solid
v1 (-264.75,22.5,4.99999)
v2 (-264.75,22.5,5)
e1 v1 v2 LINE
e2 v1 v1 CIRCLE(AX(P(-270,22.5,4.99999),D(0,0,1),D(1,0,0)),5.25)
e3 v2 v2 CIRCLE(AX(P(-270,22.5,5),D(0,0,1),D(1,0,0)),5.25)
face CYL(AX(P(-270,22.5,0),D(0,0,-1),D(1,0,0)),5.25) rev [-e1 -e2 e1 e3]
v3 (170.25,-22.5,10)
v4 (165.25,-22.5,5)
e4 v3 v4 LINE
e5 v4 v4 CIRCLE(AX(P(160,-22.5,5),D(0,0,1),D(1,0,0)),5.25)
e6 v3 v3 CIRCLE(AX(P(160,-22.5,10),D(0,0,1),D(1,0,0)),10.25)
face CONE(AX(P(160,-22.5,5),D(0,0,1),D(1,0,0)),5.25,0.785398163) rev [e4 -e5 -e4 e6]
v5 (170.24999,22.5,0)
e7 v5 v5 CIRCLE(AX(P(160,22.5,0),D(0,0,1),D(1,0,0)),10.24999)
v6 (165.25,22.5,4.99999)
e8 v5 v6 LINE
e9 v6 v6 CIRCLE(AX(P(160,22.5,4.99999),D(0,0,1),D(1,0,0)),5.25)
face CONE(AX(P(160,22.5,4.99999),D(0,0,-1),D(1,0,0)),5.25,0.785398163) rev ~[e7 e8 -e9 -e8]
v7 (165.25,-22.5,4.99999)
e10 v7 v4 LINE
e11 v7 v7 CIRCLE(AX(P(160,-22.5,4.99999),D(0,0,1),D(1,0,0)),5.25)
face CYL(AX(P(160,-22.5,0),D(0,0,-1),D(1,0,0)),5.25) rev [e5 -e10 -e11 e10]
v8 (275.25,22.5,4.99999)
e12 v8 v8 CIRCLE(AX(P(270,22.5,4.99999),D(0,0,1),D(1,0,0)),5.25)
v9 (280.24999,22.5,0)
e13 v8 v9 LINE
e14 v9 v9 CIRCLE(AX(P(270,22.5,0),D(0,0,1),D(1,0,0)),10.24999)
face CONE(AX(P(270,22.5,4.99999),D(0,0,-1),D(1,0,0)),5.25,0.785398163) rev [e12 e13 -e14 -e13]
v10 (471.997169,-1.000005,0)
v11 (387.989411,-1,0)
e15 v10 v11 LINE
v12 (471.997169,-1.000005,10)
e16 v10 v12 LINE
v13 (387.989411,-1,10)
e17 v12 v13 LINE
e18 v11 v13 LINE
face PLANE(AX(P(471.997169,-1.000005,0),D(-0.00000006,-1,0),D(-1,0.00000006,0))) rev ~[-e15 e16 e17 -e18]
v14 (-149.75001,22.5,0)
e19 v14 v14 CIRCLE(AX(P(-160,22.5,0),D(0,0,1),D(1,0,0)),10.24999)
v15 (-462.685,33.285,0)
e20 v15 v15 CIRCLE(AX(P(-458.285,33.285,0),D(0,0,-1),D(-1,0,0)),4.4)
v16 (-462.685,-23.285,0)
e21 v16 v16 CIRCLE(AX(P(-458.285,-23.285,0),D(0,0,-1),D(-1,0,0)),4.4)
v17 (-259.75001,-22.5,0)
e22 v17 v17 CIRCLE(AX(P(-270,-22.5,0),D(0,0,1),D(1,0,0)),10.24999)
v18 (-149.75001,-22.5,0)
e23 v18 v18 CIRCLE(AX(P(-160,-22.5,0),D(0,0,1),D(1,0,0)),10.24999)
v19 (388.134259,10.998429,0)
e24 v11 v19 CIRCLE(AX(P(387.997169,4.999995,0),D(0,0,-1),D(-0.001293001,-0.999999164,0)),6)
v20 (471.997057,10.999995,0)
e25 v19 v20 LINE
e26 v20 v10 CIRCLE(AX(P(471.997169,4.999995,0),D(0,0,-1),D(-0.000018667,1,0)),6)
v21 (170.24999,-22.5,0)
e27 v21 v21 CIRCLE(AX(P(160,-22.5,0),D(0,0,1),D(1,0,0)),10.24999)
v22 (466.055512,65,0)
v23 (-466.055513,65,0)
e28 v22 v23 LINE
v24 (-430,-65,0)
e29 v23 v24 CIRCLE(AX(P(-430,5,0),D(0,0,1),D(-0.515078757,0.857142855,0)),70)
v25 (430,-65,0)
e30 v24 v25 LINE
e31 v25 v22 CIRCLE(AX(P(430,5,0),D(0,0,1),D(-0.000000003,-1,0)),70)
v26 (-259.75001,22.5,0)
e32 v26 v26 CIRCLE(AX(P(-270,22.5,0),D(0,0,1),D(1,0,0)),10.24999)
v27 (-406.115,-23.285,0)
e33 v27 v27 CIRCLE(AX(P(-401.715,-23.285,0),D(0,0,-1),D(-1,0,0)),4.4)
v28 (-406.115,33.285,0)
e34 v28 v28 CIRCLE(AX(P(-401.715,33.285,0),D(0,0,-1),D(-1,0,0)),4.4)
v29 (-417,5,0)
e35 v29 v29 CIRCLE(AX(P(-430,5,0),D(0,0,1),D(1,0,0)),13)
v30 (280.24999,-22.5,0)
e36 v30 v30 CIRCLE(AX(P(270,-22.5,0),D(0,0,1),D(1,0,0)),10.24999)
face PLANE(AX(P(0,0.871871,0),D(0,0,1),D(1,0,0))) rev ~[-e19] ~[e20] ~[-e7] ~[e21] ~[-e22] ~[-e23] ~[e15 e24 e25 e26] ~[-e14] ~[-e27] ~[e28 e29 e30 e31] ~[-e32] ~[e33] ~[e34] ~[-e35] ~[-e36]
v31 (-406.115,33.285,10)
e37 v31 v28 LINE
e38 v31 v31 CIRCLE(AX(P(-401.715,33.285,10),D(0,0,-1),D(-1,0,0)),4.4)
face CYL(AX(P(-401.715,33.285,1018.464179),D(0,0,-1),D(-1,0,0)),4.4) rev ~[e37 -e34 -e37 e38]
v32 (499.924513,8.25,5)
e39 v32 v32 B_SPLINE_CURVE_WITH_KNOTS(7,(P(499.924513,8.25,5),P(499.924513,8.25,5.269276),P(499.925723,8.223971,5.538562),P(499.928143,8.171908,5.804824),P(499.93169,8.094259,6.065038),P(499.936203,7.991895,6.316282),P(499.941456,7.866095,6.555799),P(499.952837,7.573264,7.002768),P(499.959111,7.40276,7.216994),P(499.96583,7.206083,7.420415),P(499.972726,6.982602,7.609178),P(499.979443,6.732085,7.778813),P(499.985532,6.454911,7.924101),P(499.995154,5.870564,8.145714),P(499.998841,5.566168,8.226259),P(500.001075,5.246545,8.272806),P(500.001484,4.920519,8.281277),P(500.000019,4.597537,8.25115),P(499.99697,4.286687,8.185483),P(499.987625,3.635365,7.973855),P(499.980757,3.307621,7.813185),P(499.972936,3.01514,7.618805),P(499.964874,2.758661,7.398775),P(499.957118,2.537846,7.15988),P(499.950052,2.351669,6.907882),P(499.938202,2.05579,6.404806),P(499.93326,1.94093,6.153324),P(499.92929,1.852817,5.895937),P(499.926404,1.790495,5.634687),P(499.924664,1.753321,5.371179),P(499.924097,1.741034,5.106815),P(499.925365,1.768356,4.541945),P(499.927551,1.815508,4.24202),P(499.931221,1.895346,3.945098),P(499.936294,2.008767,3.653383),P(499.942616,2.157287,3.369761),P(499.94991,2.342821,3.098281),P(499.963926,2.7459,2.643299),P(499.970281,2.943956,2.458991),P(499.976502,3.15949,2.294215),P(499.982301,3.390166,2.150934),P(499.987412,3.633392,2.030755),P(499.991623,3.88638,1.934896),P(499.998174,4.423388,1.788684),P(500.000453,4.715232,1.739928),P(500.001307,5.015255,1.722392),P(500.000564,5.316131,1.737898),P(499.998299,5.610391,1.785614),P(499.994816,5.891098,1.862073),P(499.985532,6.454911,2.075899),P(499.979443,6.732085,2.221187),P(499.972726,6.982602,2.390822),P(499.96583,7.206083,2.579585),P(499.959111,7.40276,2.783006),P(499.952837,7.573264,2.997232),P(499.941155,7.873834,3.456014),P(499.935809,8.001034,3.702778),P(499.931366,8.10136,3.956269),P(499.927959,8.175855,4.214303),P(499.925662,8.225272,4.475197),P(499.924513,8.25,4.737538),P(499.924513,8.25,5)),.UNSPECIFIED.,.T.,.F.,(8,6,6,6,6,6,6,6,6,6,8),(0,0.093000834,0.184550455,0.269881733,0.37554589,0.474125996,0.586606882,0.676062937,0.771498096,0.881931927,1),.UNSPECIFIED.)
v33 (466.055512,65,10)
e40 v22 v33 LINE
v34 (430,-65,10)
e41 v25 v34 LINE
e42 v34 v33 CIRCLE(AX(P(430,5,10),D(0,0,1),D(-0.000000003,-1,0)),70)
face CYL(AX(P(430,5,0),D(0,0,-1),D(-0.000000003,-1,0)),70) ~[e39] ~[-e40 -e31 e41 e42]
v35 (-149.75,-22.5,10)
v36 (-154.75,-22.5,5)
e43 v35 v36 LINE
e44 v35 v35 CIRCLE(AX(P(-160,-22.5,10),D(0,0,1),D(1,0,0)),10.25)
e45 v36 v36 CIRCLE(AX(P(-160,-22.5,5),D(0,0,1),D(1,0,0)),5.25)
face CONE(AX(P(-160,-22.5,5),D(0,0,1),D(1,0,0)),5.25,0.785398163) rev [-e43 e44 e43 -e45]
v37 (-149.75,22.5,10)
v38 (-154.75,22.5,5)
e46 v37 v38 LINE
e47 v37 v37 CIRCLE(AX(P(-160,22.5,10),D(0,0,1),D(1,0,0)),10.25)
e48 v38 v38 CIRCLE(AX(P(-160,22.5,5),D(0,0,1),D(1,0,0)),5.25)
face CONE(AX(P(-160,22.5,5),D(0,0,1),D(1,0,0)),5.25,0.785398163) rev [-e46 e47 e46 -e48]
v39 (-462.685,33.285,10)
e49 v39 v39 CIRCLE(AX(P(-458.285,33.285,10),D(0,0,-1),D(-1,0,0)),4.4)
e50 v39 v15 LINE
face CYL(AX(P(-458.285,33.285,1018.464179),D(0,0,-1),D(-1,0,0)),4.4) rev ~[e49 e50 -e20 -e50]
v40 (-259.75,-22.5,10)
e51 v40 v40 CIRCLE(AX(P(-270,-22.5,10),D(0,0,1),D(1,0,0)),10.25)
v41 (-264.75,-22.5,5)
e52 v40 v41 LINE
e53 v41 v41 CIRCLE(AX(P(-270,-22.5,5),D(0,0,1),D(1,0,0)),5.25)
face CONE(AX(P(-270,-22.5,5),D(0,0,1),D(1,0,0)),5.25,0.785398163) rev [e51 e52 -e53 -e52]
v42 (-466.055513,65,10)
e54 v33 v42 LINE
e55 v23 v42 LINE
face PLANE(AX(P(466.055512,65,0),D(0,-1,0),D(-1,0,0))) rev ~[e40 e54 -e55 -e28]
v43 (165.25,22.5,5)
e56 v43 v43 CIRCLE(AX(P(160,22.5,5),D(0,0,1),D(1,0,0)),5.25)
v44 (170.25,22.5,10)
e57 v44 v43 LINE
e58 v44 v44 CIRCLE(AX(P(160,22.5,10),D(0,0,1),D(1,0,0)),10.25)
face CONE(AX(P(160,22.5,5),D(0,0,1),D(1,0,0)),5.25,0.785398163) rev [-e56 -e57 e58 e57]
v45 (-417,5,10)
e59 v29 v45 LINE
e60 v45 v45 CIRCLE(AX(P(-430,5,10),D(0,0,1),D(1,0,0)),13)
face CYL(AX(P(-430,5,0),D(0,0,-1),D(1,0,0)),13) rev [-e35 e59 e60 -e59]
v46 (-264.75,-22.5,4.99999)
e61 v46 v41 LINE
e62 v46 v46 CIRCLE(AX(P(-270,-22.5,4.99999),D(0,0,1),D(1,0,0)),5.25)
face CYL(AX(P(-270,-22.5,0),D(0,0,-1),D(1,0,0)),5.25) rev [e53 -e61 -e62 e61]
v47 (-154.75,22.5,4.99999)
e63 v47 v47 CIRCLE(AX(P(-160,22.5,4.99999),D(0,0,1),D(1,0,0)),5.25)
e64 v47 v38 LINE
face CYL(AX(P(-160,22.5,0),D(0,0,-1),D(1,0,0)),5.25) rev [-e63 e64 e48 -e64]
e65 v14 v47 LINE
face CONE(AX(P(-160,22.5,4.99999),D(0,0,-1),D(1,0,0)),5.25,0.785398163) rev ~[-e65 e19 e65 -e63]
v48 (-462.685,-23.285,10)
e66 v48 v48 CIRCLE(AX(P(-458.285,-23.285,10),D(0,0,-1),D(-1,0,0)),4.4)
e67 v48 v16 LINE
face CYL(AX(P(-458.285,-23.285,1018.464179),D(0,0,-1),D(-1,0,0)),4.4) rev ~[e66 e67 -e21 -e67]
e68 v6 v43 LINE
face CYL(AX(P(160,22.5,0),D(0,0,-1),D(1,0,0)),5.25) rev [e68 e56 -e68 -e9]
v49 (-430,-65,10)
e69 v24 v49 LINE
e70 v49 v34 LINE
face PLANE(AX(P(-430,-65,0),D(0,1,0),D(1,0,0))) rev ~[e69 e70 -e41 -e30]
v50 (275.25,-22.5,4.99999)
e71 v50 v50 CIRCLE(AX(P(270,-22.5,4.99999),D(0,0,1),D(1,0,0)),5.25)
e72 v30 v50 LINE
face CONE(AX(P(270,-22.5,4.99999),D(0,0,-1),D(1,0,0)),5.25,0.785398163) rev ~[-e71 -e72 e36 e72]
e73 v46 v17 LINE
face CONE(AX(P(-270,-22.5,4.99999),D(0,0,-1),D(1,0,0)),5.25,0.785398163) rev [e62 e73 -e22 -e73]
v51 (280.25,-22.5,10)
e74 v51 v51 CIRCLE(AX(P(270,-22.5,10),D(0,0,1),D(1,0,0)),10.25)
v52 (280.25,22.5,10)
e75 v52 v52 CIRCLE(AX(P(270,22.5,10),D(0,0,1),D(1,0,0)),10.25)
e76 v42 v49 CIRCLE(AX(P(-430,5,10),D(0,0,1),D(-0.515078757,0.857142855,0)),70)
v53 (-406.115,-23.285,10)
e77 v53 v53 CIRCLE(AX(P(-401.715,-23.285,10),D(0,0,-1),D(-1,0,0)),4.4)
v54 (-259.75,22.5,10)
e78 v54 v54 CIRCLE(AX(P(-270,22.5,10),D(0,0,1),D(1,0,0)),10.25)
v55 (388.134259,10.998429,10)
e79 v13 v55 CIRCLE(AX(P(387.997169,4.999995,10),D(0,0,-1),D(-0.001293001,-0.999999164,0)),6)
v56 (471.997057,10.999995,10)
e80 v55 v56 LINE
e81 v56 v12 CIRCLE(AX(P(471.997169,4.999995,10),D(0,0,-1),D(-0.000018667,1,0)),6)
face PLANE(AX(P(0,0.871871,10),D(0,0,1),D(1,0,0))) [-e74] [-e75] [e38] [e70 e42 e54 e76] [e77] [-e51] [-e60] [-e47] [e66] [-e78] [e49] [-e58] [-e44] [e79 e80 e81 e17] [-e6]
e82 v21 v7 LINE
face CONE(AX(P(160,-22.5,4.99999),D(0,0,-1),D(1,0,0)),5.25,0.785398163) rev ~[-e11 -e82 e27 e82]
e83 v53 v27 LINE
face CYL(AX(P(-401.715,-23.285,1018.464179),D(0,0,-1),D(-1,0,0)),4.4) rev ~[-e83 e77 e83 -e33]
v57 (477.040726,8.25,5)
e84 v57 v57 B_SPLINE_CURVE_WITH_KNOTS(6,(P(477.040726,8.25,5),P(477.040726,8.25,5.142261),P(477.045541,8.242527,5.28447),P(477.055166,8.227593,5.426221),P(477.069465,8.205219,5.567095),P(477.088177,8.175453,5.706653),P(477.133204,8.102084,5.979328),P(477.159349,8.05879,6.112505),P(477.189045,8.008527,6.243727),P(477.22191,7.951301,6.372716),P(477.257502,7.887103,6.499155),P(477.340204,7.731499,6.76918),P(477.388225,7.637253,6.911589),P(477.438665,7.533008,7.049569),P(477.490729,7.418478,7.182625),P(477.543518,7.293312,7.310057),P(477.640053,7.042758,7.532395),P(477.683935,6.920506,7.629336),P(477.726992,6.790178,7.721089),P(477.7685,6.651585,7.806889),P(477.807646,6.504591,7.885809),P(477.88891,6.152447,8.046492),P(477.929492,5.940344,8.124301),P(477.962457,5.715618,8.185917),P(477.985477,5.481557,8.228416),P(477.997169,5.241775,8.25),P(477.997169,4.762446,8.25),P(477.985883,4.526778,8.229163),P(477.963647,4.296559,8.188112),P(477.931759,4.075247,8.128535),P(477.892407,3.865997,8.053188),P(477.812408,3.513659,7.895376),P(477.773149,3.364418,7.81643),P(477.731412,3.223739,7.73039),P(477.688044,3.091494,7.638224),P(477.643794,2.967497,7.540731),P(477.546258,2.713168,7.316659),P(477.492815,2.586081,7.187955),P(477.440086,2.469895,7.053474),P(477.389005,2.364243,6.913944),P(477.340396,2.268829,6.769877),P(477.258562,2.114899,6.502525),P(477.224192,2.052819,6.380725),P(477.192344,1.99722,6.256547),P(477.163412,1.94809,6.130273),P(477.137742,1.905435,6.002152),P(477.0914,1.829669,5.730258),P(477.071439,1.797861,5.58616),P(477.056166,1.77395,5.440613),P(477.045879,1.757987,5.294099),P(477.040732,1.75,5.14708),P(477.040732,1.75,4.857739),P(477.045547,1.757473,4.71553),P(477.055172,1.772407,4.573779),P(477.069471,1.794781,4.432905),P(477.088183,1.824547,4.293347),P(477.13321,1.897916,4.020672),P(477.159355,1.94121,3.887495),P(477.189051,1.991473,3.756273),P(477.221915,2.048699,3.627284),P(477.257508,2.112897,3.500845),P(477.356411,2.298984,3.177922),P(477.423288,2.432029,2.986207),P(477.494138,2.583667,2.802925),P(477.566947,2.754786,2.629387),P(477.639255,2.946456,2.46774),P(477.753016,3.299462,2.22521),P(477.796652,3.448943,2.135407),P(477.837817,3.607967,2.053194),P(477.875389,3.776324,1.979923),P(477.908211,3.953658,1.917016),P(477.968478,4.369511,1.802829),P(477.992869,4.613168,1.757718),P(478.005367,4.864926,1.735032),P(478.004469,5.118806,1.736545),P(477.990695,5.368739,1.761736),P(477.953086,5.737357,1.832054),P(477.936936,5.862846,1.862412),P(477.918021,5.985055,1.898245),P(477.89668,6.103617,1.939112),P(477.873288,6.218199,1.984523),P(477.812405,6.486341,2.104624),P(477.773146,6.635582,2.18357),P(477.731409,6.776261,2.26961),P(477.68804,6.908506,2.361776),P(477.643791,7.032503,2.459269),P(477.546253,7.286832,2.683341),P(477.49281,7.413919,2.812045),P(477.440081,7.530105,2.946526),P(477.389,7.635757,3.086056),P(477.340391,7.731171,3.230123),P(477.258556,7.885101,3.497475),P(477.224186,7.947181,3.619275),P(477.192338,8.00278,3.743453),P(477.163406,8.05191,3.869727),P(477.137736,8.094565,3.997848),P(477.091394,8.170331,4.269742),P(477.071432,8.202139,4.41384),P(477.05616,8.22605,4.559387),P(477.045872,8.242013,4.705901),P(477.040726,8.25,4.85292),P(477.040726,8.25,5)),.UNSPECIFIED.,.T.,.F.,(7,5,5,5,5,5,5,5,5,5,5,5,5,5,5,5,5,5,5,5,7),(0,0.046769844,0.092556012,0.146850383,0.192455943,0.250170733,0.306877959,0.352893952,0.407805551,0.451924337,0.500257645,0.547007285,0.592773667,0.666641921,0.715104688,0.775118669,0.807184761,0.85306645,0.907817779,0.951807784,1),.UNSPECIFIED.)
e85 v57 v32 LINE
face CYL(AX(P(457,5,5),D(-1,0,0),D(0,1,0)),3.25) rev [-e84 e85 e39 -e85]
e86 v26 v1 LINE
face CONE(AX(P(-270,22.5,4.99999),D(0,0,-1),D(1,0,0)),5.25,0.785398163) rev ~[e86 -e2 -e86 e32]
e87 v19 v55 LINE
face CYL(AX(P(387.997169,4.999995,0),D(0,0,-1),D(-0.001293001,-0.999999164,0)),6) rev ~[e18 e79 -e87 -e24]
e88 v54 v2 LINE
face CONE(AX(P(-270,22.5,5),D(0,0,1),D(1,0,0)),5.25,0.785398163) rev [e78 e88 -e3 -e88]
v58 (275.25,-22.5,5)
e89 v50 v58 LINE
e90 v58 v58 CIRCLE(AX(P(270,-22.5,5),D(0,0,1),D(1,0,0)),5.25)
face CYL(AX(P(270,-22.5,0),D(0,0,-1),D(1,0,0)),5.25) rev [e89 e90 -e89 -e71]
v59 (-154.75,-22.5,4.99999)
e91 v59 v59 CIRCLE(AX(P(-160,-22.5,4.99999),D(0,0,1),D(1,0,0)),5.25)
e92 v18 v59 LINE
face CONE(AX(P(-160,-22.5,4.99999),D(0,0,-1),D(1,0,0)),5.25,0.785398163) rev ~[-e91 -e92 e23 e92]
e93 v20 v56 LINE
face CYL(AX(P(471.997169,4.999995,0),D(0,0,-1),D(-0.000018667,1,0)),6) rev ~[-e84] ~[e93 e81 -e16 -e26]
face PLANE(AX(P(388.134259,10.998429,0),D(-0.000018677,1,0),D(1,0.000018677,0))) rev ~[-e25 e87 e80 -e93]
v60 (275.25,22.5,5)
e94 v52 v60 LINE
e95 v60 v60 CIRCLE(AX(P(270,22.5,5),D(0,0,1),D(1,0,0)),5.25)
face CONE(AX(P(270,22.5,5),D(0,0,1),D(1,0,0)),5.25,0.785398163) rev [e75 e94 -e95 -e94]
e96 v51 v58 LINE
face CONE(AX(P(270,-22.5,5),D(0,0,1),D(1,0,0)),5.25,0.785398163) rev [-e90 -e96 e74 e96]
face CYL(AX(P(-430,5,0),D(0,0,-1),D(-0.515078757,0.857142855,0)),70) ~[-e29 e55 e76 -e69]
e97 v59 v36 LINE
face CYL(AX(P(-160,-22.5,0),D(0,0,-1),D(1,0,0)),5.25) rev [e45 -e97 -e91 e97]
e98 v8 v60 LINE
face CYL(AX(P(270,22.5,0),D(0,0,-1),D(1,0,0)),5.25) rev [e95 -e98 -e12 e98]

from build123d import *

# Parameters (mm, degrees)
F0_R     = 3.4
F0_R_2   = 5.25
F0_R_3   = 13
F1_DEPTH = 10
F3_D     = 8.8
F5_R     = 3.25
F6_DEPTH = 43.0009999364
F7_SIZE  = 5
F8_SIZE  = 5
F9_SIZE  = 4.99999


# Not quite as in the source:
# - a fillet or chamfer is up to 0.001 mm smaller than in the source, because OpenCascade refuses the exact size
# - ends of sketch curves that miss each other by under 0.0002 mm in the source are joined


with BuildPart() as f1:
    # F0 (on Top) → F1 (new body)
    with BuildSketch(Plane.XY):
        with BuildLine():
            Line((466.055512, 65), (-466.055513, 65))
            ThreePointArc((-466.055513, 65), (-497.4536877881, -13.7082870352), (-430, -65))
            Line((-430, -65), (430, -65))
            ThreePointArc((430, -65), (497.4536879026, -13.7082866222), (466.055512, 65))
        make_face()
        with Locations((-458.285, -23.285)):
            Circle(F0_R, mode=Mode.SUBTRACT)
        with Locations((-401.715, -23.285)):
            Circle(F0_R, mode=Mode.SUBTRACT)
        with Locations((-270, -22.5)):
            Circle(F0_R_2, mode=Mode.SUBTRACT)
        with Locations((-160, -22.5)):
            Circle(F0_R_2, mode=Mode.SUBTRACT)
        with Locations((160, -22.5)):
            Circle(F0_R_2, mode=Mode.SUBTRACT)
        with Locations((270, -22.5)):
            Circle(F0_R_2, mode=Mode.SUBTRACT)
        with Locations((-430, 5)):
            Circle(F0_R_3, mode=Mode.SUBTRACT)
        with Locations((-270, 22.5)):
            Circle(F0_R_2, mode=Mode.SUBTRACT)
        with Locations((-160, 22.5)):
            Circle(F0_R_2, mode=Mode.SUBTRACT)
        with Locations((-458.285, 33.285)):
            Circle(F0_R, mode=Mode.SUBTRACT)
        with Locations((-401.715, 33.285)):
            Circle(F0_R, mode=Mode.SUBTRACT)
        with Locations((160, 22.5)):
            Circle(F0_R_2, mode=Mode.SUBTRACT)
        with BuildLine():
            ThreePointArc((471.997057, 10.999994999), (477.9971689997, 5.000051), (471.997169, -1.000005))
            Line((471.997169, -1.000005), (387.989411, -1))
            ThreePointArc((387.989411, -1), (381.9976061696, 5.0724232034), (388.1342589922, 10.9984286567))
            Line((388.1342589922, 10.9984286567), (471.997057, 10.999994999))
        make_face(mode=Mode.SUBTRACT)
        with Locations((270, 22.5)):
            Circle(F0_R_2, mode=Mode.SUBTRACT)
    extrude(amount=F1_DEPTH)

    # F3 (through all)
    with Locations(Plane.XY.offset(10)):
        with Locations((-458.285, -23.285), (-401.715, -23.285), (-401.715, 33.285), (-458.285, 33.285)):
            Hole(F3_D / 2)

    # F5 (on offset) → F6 (cut, through all)
    with BuildSketch(Plane.YZ.offset(457)):
        with Locations((5, 5)):
            Circle(F5_R)
    extrude(amount=F6_DEPTH, mode=Mode.SUBTRACT)

    # F7
    f7_edges = [f1.edges().sort_by_distance(p)[0] for p in [
        (-275.25, -22.5, 10),
        (-275.25, 22.5, 10),
        (-165.25, -22.5, 10),
        (-165.25, 22.5, 10),
    ]]
    chamfer(f7_edges, length=F7_SIZE)

    # F8
    f8_edges = [f1.edges().sort_by_distance(p)[0] for p in [
        (264.75, 22.5, 10),
        (264.75, -22.5, 10),
        (154.75, -22.5, 10),
        (154.75, 22.5, 10),
    ]]
    chamfer(f8_edges, length=F8_SIZE)

    # F9 (size 5 in the source; OpenCascade refuses exactly that, so slightly less here)
    f9_edges = [f1.edges().sort_by_distance(p)[0] for p in [
        (264.75, -22.5, 0),
        (264.75, 22.5, 0),
        (154.75, 22.5, 0),
        (154.75, -22.5, 0),
        (-165.25, 22.5, 0),
        (-165.25, -22.5, 0),
        (-275.25, 22.5, 0),
        (-275.25, -22.5, 0),
    ]]
    chamfer(f9_edges, length=F9_SIZE)


solid = f1.part
